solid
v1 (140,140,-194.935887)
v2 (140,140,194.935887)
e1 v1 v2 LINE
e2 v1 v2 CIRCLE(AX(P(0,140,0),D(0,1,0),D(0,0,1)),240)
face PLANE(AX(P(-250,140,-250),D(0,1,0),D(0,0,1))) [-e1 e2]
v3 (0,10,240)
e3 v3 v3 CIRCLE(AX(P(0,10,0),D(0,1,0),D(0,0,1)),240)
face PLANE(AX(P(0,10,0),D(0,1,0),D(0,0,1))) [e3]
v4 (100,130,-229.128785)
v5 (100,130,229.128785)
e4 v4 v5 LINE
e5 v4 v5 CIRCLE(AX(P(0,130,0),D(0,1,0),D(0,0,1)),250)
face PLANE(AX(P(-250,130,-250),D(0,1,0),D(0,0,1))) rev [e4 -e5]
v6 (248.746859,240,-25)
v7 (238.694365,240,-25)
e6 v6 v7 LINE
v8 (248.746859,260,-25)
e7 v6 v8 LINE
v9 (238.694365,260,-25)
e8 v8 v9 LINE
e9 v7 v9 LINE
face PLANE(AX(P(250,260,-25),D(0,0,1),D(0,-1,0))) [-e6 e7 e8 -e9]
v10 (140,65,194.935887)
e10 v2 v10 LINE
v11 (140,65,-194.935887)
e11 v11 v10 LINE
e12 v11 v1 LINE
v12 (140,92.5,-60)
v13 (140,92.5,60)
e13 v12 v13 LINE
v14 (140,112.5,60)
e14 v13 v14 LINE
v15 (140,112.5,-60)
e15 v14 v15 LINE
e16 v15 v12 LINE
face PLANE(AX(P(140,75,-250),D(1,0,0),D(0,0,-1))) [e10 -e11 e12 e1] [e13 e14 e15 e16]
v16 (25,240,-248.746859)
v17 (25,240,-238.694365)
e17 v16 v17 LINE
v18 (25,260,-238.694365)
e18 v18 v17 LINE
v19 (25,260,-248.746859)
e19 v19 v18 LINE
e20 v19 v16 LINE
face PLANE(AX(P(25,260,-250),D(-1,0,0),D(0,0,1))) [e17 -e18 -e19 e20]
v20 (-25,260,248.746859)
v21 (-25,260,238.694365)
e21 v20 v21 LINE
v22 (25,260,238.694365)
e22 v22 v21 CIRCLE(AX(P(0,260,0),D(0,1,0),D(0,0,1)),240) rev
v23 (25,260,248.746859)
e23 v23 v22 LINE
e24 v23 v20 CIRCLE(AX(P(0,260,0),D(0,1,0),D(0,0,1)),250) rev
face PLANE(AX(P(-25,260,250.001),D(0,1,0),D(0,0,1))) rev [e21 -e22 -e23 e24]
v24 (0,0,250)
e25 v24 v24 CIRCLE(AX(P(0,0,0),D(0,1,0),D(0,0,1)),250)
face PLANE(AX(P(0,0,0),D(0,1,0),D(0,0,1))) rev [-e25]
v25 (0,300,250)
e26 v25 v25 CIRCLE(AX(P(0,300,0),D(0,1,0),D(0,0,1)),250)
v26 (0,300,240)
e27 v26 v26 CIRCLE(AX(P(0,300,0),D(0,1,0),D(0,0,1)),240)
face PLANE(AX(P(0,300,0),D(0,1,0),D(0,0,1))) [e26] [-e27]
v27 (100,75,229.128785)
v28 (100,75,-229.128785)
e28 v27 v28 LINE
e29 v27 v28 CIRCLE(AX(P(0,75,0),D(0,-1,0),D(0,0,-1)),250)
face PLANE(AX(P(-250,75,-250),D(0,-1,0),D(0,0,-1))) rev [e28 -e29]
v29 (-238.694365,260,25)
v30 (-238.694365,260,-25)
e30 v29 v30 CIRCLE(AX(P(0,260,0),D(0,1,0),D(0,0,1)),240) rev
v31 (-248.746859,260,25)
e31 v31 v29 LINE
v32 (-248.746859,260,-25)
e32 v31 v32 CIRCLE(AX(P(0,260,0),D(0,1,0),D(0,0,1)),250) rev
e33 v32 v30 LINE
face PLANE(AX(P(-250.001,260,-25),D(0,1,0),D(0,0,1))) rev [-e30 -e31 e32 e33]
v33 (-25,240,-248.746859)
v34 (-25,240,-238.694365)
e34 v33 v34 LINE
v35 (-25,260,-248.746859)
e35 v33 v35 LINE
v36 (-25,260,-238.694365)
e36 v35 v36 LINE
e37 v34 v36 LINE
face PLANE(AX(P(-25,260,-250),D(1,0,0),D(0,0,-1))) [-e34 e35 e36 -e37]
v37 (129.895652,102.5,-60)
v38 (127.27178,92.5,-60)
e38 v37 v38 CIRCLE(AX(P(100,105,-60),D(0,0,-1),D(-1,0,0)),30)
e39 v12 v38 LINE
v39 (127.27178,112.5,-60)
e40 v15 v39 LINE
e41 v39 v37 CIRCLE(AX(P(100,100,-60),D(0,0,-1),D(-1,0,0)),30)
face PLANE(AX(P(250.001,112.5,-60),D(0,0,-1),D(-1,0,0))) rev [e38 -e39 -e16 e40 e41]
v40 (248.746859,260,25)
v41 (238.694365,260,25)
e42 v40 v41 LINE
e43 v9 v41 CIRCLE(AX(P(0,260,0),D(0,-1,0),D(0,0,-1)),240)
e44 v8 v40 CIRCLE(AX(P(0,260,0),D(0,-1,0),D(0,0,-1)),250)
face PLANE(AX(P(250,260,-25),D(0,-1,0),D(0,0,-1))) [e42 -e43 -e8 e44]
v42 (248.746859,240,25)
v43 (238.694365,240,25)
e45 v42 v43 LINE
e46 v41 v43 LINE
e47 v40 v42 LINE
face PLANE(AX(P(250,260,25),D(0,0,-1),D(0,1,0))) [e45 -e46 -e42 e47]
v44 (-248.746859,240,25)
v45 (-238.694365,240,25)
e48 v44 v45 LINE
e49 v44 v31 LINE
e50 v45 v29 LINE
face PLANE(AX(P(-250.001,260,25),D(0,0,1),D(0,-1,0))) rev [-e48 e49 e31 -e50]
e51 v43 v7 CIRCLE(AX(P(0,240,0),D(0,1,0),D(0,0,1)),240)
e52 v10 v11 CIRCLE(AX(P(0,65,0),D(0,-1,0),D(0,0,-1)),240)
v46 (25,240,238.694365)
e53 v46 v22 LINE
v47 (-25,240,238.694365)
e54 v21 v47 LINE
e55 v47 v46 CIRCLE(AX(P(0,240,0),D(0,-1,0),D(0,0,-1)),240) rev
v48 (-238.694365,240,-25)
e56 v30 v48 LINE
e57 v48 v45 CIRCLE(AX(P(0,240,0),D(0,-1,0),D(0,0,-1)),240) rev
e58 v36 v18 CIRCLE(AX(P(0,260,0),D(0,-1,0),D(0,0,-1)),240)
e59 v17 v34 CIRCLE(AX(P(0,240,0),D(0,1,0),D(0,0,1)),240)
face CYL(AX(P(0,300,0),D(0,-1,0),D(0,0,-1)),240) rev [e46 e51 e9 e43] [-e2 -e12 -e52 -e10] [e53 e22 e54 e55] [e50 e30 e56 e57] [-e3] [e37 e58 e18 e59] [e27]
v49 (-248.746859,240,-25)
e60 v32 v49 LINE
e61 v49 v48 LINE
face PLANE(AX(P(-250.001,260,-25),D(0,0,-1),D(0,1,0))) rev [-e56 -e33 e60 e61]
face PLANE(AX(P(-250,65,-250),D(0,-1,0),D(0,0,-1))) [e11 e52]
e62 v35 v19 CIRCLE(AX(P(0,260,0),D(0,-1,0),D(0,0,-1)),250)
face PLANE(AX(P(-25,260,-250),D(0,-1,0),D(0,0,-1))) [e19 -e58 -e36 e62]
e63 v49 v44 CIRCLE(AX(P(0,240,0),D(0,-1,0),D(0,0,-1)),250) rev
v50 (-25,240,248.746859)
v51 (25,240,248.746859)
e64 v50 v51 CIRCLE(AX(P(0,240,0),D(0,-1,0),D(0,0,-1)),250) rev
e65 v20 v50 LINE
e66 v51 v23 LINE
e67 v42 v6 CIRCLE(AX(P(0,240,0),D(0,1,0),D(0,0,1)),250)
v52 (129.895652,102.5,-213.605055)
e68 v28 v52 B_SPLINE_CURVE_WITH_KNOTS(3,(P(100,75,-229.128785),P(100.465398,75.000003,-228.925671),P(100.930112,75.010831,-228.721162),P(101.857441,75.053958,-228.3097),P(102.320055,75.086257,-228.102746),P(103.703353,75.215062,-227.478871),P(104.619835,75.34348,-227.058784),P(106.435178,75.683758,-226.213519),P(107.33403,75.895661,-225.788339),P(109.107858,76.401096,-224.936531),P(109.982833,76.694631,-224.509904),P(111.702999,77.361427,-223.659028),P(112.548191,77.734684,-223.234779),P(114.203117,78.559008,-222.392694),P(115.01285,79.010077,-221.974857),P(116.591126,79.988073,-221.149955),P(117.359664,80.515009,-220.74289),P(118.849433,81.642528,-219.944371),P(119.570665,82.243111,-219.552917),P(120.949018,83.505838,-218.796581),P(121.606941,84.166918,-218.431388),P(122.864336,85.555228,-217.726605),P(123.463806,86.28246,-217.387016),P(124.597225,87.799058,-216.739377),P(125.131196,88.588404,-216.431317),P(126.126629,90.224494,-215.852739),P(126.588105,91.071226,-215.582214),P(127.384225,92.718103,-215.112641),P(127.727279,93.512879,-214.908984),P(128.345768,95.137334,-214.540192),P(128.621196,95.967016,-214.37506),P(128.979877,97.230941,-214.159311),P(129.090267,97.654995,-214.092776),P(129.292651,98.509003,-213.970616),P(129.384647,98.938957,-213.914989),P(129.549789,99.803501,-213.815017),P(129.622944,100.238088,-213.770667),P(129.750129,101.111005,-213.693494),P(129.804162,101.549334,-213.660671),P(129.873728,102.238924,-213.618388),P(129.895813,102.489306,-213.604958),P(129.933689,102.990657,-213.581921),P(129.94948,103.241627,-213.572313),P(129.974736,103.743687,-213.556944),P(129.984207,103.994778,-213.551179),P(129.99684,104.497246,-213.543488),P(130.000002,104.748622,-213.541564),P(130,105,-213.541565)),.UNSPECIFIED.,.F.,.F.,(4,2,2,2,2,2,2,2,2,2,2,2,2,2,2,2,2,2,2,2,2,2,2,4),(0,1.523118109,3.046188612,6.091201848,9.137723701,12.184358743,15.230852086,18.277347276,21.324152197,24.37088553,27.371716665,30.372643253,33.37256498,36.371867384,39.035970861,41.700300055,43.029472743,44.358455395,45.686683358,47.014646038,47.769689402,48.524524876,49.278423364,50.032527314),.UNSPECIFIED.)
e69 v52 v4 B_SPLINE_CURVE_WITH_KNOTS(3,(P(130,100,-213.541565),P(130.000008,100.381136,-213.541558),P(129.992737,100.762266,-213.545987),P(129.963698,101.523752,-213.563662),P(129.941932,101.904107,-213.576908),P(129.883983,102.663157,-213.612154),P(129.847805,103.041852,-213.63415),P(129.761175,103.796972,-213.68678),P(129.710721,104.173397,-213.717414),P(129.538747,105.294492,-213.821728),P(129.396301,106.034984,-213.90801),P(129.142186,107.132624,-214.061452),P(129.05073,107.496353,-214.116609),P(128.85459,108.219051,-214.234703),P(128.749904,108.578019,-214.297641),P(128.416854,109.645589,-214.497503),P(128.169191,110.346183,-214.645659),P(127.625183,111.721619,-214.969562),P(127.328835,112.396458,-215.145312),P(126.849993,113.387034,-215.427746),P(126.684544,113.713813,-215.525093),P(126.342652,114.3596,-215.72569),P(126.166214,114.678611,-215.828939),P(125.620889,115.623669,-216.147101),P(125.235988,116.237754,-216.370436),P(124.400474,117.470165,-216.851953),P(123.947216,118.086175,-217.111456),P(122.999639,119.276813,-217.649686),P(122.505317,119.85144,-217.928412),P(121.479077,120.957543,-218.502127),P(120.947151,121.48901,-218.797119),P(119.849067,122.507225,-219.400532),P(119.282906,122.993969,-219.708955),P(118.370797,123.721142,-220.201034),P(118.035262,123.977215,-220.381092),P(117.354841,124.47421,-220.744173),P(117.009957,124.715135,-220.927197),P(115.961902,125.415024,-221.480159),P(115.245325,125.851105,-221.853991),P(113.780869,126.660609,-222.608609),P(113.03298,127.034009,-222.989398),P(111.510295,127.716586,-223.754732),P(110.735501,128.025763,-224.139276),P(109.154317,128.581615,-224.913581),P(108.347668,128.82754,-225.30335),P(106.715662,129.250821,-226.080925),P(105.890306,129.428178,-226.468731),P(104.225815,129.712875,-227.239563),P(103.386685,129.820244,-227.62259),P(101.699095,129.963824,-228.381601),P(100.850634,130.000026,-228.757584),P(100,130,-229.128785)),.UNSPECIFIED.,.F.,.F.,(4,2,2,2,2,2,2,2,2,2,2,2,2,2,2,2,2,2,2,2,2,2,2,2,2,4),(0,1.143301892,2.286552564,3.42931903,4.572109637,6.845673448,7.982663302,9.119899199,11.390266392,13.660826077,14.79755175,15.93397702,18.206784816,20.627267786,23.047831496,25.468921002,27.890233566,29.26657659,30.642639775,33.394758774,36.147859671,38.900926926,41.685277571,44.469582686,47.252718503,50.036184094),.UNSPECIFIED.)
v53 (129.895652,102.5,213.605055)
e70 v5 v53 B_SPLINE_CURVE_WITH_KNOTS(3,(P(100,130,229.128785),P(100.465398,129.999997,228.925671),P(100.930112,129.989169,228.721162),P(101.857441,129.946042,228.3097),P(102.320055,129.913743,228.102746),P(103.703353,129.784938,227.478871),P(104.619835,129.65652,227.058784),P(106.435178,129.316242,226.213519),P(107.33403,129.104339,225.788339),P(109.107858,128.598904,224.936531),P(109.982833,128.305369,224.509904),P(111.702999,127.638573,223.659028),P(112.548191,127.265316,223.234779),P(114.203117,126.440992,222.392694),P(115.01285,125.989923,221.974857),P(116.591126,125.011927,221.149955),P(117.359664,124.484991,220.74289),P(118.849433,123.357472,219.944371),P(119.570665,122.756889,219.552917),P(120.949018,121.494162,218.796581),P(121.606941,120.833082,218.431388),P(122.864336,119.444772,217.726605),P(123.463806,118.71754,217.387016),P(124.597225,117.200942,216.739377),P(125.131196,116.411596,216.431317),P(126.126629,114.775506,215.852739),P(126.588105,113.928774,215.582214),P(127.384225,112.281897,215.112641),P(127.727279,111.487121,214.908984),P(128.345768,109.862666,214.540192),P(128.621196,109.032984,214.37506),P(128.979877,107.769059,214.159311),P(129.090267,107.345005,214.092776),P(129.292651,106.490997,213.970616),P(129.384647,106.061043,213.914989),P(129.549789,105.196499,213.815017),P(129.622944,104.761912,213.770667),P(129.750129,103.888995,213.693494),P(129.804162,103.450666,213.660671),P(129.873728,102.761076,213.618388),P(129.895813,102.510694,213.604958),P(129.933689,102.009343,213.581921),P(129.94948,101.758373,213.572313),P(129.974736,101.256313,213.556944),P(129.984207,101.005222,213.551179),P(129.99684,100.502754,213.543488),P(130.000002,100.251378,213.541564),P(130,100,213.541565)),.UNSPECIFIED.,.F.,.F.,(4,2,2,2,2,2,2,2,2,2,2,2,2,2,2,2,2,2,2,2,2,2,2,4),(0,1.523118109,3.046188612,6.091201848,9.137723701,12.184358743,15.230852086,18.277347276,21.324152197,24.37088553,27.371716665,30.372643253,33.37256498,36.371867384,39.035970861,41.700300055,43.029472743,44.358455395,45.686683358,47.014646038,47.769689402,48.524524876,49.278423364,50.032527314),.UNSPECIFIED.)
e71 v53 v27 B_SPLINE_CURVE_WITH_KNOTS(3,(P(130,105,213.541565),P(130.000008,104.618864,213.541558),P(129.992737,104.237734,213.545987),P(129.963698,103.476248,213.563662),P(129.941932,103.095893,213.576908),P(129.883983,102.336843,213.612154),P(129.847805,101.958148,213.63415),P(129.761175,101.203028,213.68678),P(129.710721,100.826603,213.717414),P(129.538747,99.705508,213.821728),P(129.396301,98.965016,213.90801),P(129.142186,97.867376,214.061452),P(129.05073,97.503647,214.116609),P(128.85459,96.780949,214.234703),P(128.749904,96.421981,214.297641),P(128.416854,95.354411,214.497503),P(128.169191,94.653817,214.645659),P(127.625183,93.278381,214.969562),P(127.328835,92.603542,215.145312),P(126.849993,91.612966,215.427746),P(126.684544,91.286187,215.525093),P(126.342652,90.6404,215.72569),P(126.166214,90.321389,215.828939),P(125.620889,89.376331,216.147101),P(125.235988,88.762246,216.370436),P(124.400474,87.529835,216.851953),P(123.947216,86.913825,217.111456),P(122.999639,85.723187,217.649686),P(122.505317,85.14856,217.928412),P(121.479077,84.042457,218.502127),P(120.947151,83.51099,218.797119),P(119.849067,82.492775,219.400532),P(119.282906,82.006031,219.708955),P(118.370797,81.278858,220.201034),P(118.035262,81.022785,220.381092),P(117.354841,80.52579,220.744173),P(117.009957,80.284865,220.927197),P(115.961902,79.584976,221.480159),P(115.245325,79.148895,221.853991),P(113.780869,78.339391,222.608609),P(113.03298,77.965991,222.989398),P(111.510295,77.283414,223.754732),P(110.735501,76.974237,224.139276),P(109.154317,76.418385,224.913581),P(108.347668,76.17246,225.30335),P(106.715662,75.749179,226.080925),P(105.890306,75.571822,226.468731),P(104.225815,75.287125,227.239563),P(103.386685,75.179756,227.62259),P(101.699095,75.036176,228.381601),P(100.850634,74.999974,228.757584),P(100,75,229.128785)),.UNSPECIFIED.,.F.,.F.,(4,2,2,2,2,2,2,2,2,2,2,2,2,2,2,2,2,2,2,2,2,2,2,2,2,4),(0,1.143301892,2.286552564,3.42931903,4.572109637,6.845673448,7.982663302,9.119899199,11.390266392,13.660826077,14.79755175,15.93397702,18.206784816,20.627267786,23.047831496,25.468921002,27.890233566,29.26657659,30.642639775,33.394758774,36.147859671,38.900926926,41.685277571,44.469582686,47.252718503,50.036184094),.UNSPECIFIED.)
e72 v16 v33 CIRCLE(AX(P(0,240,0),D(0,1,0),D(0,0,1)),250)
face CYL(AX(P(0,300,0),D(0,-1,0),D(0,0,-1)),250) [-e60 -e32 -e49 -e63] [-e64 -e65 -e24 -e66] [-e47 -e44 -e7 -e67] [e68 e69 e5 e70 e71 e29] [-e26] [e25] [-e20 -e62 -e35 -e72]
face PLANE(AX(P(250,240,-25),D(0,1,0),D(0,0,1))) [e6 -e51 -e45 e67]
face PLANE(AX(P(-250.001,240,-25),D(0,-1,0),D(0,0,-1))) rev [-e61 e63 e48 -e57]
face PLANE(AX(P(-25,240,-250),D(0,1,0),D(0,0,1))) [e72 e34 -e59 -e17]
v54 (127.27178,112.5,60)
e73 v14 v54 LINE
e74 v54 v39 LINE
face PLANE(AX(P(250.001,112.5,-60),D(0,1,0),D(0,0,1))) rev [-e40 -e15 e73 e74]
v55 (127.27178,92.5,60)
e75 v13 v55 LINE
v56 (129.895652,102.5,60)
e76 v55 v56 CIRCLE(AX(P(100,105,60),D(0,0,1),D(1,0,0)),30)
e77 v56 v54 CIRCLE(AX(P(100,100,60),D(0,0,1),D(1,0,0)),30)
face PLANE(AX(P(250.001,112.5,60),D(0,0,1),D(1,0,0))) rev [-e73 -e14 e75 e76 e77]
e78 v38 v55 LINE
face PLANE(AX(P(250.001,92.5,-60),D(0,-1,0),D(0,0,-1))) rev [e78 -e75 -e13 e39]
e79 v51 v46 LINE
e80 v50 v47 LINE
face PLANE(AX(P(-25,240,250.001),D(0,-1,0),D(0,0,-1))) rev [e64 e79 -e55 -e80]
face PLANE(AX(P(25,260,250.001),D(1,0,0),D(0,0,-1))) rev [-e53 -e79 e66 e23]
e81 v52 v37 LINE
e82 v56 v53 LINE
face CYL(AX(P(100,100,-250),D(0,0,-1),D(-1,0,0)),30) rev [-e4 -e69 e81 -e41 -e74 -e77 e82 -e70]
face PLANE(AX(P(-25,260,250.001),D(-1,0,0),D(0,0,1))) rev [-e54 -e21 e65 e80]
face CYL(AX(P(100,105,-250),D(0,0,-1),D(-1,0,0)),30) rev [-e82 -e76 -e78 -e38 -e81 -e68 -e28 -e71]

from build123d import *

# Parameters (mm, degrees)
SKETCH2_R                      = 250
BOSS_EXTRUDE1_DEPTH            = 300
CUT_EXTRUDE1_DEPTH             = 464.680924775
CUT_EXTRUDE1_DEPTH_BACK        = 464.680924775
SKETCH3_W                      = 380
SKETCH3_H                      = 55
SHELL1_START                   = 140
SHELL1_OUTLINE_R               = 240
SHELL1_DEPTH                   = 150
SHELL1_START_2                 = 10
SHELL1_2_OUTLINE_R             = 240
SHELL1_2_DEPTH                 = 55
SHELL1_START_3                 = 65
SHELL1_3_DEPTH                 = 75
CUT_EXTRUDE2_REACH             = 546.885
SKETCH4_W                      = 120
SKETCH4_H                      = 20
CUT_EXTRUDE5_START             = -20
SKETCH6_R                      = 240
CUT_EXTRUDE5_DEPTH             = 20
CUT_EXTRUDE6_REACH             = 465.681
SKETCH8_3_W                    = 50
SKETCH8_3_H                    = 20
CUT_EXTRUDE6_DIRECTION_2_DEPTH = 464.680924775
CIRPATTERN1_COUNT              = 2
CIRPATTERN1_ANGLE              = 90
FILLET2_R                      = 30


# Read off the part's stored shape, not the designer's step: Shell1
with BuildPart() as part:
    # Sketch2 → Boss-Extrude1 (new body)
    with BuildSketch(Plane(origin=(0, 0, 0), x_dir=(1, 0, 0), z_dir=(0, 1, 0))):
        with Locations(Location((0, 0, 0), (0, 0, 270))):
            Circle(SKETCH2_R)
    extrude(amount=BOSS_EXTRUDE1_DEPTH)

    # Sketch3 → Cut-Extrude1 (cut, two sides: drawn at the far end of the back side and taken through both)
    with BuildSketch(Plane.XY.offset(-CUT_EXTRUDE1_DEPTH_BACK)):
        with Locations((-60, 102.5)):
            Rectangle(SKETCH3_W, SKETCH3_H)
    extrude(amount=CUT_EXTRUDE1_DEPTH + CUT_EXTRUDE1_DEPTH_BACK, mode=Mode.SUBTRACT)

    # Shell1 outline → Shell1 (cut)
    with BuildSketch(Plane(origin=(0, 0, 0), x_dir=(1, 0, 0), z_dir=(0, 1, 0)).offset(SHELL1_START)):
        Circle(SHELL1_OUTLINE_R)
    extrude(amount=SHELL1_DEPTH, mode=Mode.SUBTRACT)

    # Shell1 2 outline → Shell1 2 (cut)
    with BuildSketch(Plane(origin=(0, 0, 0), x_dir=(1, 0, 0), z_dir=(0, 1, 0)).offset(SHELL1_START_2)):
        Circle(SHELL1_2_OUTLINE_R)
    extrude(amount=SHELL1_2_DEPTH, mode=Mode.SUBTRACT)

    # Shell1 3 outline → Shell1 3 (cut)
    with BuildSketch(Plane(origin=(0, 0, 0), x_dir=(1, 0, 0), z_dir=(0, 1, 0)).offset(SHELL1_START_3)):
        with BuildLine():
            ThreePointArc((140, -194.935886896), (240, 0), (140, 194.935886896))
            Line((140, 194.935886896), (140, -194.935886896))
        make_face()
    extrude(amount=SHELL1_3_DEPTH, mode=Mode.SUBTRACT)

    # Sketch4 → Cut-Extrude2 (cut, up to next)
    with BuildSketch(Plane.ZY.offset(-130), mode=Mode.PRIVATE) as cut_extrude2_sk1:
        with Locations((0, 102.5)):
            Rectangle(SKETCH4_W, SKETCH4_H)
    cut_extrude2_tool1 = extrude(cut_extrude2_sk1.sketch, amount=-CUT_EXTRUDE2_REACH, mode=Mode.PRIVATE) & part.part
    add(cut_extrude2_tool1.solids().sort_by_distance((130, 102.5, 0))[0], mode=Mode.SUBTRACT)

    # Sketch6 → Cut-Extrude5 (cut)
    with BuildSketch(Plane(origin=(0, 300, 0), x_dir=(1, 0, 0), z_dir=(0, 1, 0)).offset(CUT_EXTRUDE5_START)):
        with Locations(Location((0, 0, 0), (0, 0, 270))):
            Circle(SKETCH6_R)
    extrude(amount=CUT_EXTRUDE5_DEPTH, mode=Mode.SUBTRACT)

    # Sketch8<3> → Cut-Extrude6 (cut, up to next)
    with BuildSketch(Plane(origin=(0, 0, 0), x_dir=(0, 0, -1), z_dir=(1, 0, 0)), mode=Mode.PRIVATE) as cut_extrude6_sk1:
        with Locations((0, 250)):
            Rectangle(SKETCH8_3_W, SKETCH8_3_H)
    cut_extrude6_tool1 = extrude(cut_extrude6_sk1.sketch, amount=-CUT_EXTRUDE6_REACH, mode=Mode.PRIVATE) & part.part
    cut_extrude6 = cut_extrude6_tool1.solids().sort_by_distance((0, 250, 0))[0]
    add(cut_extrude6, mode=Mode.SUBTRACT)

    # Sketch8<3> → Cut-Extrude6 direction 2 (cut)
    with BuildSketch(Plane(origin=(0, 0, 0), x_dir=(0, 0, -1), z_dir=(1, 0, 0))):
        with Locations((0, 250)):
            Rectangle(SKETCH8_3_W, SKETCH8_3_H)
    cut_extrude6_direction_2 = extrude(amount=CUT_EXTRUDE6_DIRECTION_2_DEPTH, mode=Mode.SUBTRACT)

    # CirPattern1: Cut-Extrude6, Cut-Extrude6 direction 2 ×2 about axis
    cirpattern1_axis = Axis((0, 300, 0), (0, 1, 0))
    add([cut_extrude6.rotate(cirpattern1_axis, i * CIRPATTERN1_ANGLE / (CIRPATTERN1_COUNT - 1)) for i in range(1, CIRPATTERN1_COUNT)], mode=Mode.SUBTRACT)
    add([cut_extrude6_direction_2.rotate(cirpattern1_axis, i * CIRPATTERN1_ANGLE / (CIRPATTERN1_COUNT - 1)) for i in range(1, CIRPATTERN1_COUNT)], mode=Mode.SUBTRACT)

    # Fillet2
    # the kernel refuses this fillet: 30 mm, written as the material it adds along each edge
    with BuildSketch(Plane(origin=(130, 130, -288.541565041), x_dir=(0, -1, 0), z_dir=(0, 0, 1))) as fillet2_piece_1_section:
        with BuildLine():
            CenterArc((FILLET2_R, -FILLET2_R), FILLET2_R, 90, 90)
            Line((0, -FILLET2_R), (0, 0))
            Line((0, 0), (FILLET2_R, 0))
        make_face()
    fillet2_piece_1 = extrude(amount=577.083130081, mode=Mode.PRIVATE)
    fillet2_piece_1 = fillet2_piece_1 & Plane(origin=(0, 108.141191738, 0), x_dir=(0, 0, 1), z_dir=(0, -1, 0)) * Cylinder(250, 1275, mode=Mode.PRIVATE)
    fillet2_piece_1 = split(fillet2_piece_1, bisect_by=Plane(origin=(129.633192853, 108.141191738, -60), z_dir=(0, 0, -1)), keep=Keep.TOP, mode=Mode.PRIVATE)
    fillet2_piece_1 = split(fillet2_piece_1, bisect_by=Plane(origin=(129.633192853, 112.5, -136.881350588), z_dir=(0, -1, 0)), keep=Keep.TOP, mode=Mode.PRIVATE)
    add(fillet2_piece_1)
    with BuildSketch(Plane(origin=(130, 130, -288.541565041), x_dir=(0, -1, 0), z_dir=(0, 0, 1))) as fillet2_piece_2_section:
        with BuildLine():
            CenterArc((FILLET2_R, -FILLET2_R), FILLET2_R, 90, 90)
            Line((0, -FILLET2_R), (0, 0))
            Line((0, 0), (FILLET2_R, 0))
        make_face()
    fillet2_piece_2 = extrude(amount=577.083130081, mode=Mode.PRIVATE)
    fillet2_piece_2 = fillet2_piece_2 & Plane(origin=(0, 124.602125162, 0), x_dir=(0, 0, 1), z_dir=(0, -1, 0)) * Cylinder(250, 1275, mode=Mode.PRIVATE)
    fillet2_piece_2 = split(fillet2_piece_2, bisect_by=Plane(origin=(122.496617269, 124.602125162, -60), z_dir=(0, 0, -1)), keep=Keep.TOP, mode=Mode.PRIVATE)
    fillet2_piece_2 = split(fillet2_piece_2, bisect_by=Plane(origin=(122.496617269, 112.5, -138.903095836), z_dir=(0, 1, 0)), keep=Keep.TOP, mode=Mode.PRIVATE)
    add(fillet2_piece_2)
    with BuildSketch(Plane(origin=(130, 130, -288.541565041), x_dir=(0, -1, 0), z_dir=(0, 0, 1))) as fillet2_piece_3_section:
        with BuildLine():
            CenterArc((FILLET2_R, -FILLET2_R), FILLET2_R, 90, 90)
            Line((0, -FILLET2_R), (0, 0))
            Line((0, 0), (FILLET2_R, 0))
        make_face()
    fillet2_piece_3 = extrude(amount=577.083130081, mode=Mode.PRIVATE)
    fillet2_piece_3 = split(fillet2_piece_3, bisect_by=Plane(origin=(122.639576661, 124.541490092, -60), z_dir=(0, 0, 1)), keep=Keep.TOP, mode=Mode.PRIVATE)
    fillet2_piece_3 = split(fillet2_piece_3, bisect_by=Plane(origin=(122.639576661, 124.541490092, 60), z_dir=(0, 0, -1)), keep=Keep.TOP, mode=Mode.PRIVATE)
    fillet2_piece_3 = split(fillet2_piece_3, bisect_by=Plane(origin=(122.639576661, 112.5, 0), z_dir=(0, 1, 0)), keep=Keep.TOP, mode=Mode.PRIVATE)
    add(fillet2_piece_3)
    with BuildSketch(Plane(origin=(130, 130, -288.541565041), x_dir=(0, -1, 0), z_dir=(0, 0, 1))) as fillet2_piece_4_section:
        with BuildLine():
            CenterArc((FILLET2_R, -FILLET2_R), FILLET2_R, 90, 90)
            Line((0, -FILLET2_R), (0, 0))
            Line((0, 0), (FILLET2_R, 0))
        make_face()
    fillet2_piece_4 = extrude(amount=577.083130081, mode=Mode.PRIVATE)
    fillet2_piece_4 = fillet2_piece_4 & Plane(origin=(0, 108.141191737, 0), x_dir=(0, 0, 1), z_dir=(0, -1, 0)) * Cylinder(250, 1275, mode=Mode.PRIVATE)
    fillet2_piece_4 = split(fillet2_piece_4, bisect_by=Plane(origin=(129.633192853, 108.141191737, 60), z_dir=(0, 0, 1)), keep=Keep.TOP, mode=Mode.PRIVATE)
    fillet2_piece_4 = split(fillet2_piece_4, bisect_by=Plane(origin=(129.633192853, 112.5, 136.881350585), z_dir=(0, -1, 0)), keep=Keep.TOP, mode=Mode.PRIVATE)
    add(fillet2_piece_4)
    with BuildSketch(Plane(origin=(130, 130, -288.541565041), x_dir=(0, -1, 0), z_dir=(0, 0, 1))) as fillet2_piece_5_section:
        with BuildLine():
            CenterArc((FILLET2_R, -FILLET2_R), FILLET2_R, 90, 90)
            Line((0, -FILLET2_R), (0, 0))
            Line((0, 0), (FILLET2_R, 0))
        make_face()
    fillet2_piece_5 = extrude(amount=577.083130081, mode=Mode.PRIVATE)
    fillet2_piece_5 = fillet2_piece_5 & Plane(origin=(0, 124.602106632, 0), x_dir=(0, 0, 1), z_dir=(0, -1, 0)) * Cylinder(250, 1275, mode=Mode.PRIVATE)
    fillet2_piece_5 = split(fillet2_piece_5, bisect_by=Plane(origin=(122.496572682, 124.602106632, 60), z_dir=(0, 0, 1)), keep=Keep.TOP, mode=Mode.PRIVATE)
    fillet2_piece_5 = split(fillet2_piece_5, bisect_by=Plane(origin=(122.496572682, 112.5, 138.903516263), z_dir=(0, 1, 0)), keep=Keep.TOP, mode=Mode.PRIVATE)
    add(fillet2_piece_5)
    with BuildSketch(Plane(origin=(130, 75, -288.541565041), x_dir=(-1, 0, 0), z_dir=(0, 0, 1))) as fillet2_piece_6_section:
        with BuildLine():
            CenterArc((FILLET2_R, -FILLET2_R), FILLET2_R, 90, 90)
            Line((0, -FILLET2_R), (0, 0))
            Line((0, 0), (FILLET2_R, 0))
        make_face()
    fillet2_piece_6 = extrude(amount=577.083130081, mode=Mode.PRIVATE)
    fillet2_piece_6 = fillet2_piece_6 & Plane(origin=(0, 80.397884307, 0), x_dir=(0, 0, 1), z_dir=(0, -1, 0)) * Cylinder(250, 1275, mode=Mode.PRIVATE)
    fillet2_piece_6 = split(fillet2_piece_6, bisect_by=Plane(origin=(122.496621968, 80.397884307, -60), z_dir=(0, 0, -1)), keep=Keep.TOP, mode=Mode.PRIVATE)
    fillet2_piece_6 = split(fillet2_piece_6, bisect_by=Plane(origin=(122.496621968, 92.5, -138.903256412), z_dir=(0, -1, 0)), keep=Keep.TOP, mode=Mode.PRIVATE)
    add(fillet2_piece_6)
    with BuildSketch(Plane(origin=(130, 75, -288.541565041), x_dir=(-1, 0, 0), z_dir=(0, 0, 1))) as fillet2_piece_7_section:
        with BuildLine():
            CenterArc((FILLET2_R, -FILLET2_R), FILLET2_R, 90, 90)
            Line((0, -FILLET2_R), (0, 0))
            Line((0, 0), (FILLET2_R, 0))
        make_face()
    fillet2_piece_7 = extrude(amount=577.083130081, mode=Mode.PRIVATE)
    fillet2_piece_7 = fillet2_piece_7 & Plane(origin=(0, 96.858808254, 0), x_dir=(0, 0, 1), z_dir=(0, -1, 0)) * Cylinder(250, 1275, mode=Mode.PRIVATE)
    fillet2_piece_7 = split(fillet2_piece_7, bisect_by=Plane(origin=(129.633192853, 96.858808254, -60), z_dir=(0, 0, -1)), keep=Keep.TOP, mode=Mode.PRIVATE)
    fillet2_piece_7 = split(fillet2_piece_7, bisect_by=Plane(origin=(129.633192853, 92.5, -136.881350463), z_dir=(0, 1, 0)), keep=Keep.TOP, mode=Mode.PRIVATE)
    add(fillet2_piece_7)
    with BuildSketch(Plane(origin=(130, 75, -288.541565041), x_dir=(-1, 0, 0), z_dir=(0, 0, 1))) as fillet2_piece_8_section:
        with BuildLine():
            CenterArc((FILLET2_R, -FILLET2_R), FILLET2_R, 90, 90)
            Line((0, -FILLET2_R), (0, 0))
            Line((0, 0), (FILLET2_R, 0))
        make_face()
    fillet2_piece_8 = extrude(amount=577.083130081, mode=Mode.PRIVATE)
    fillet2_piece_8 = split(fillet2_piece_8, bisect_by=Plane(origin=(122.639576661, 80.458509908, -60), z_dir=(0, 0, 1)), keep=Keep.TOP, mode=Mode.PRIVATE)
    fillet2_piece_8 = split(fillet2_piece_8, bisect_by=Plane(origin=(122.639576661, 92.5, 0), z_dir=(0, -1, 0)), keep=Keep.TOP, mode=Mode.PRIVATE)
    fillet2_piece_8 = split(fillet2_piece_8, bisect_by=Plane(origin=(122.639576661, 80.458509908, 60), z_dir=(0, 0, -1)), keep=Keep.TOP, mode=Mode.PRIVATE)
    add(fillet2_piece_8)
    with BuildSketch(Plane(origin=(130, 75, -288.541565041), x_dir=(-1, 0, 0), z_dir=(0, 0, 1))) as fillet2_piece_9_section:
        with BuildLine():
            CenterArc((FILLET2_R, -FILLET2_R), FILLET2_R, 90, 90)
            Line((0, -FILLET2_R), (0, 0))
            Line((0, 0), (FILLET2_R, 0))
        make_face()
    fillet2_piece_9 = extrude(amount=577.083130081, mode=Mode.PRIVATE)
    fillet2_piece_9 = fillet2_piece_9 & Plane(origin=(0, 80.397869734, 0), x_dir=(0, 0, 1), z_dir=(0, -1, 0)) * Cylinder(250, 1275, mode=Mode.PRIVATE)
    fillet2_piece_9 = split(fillet2_piece_9, bisect_by=Plane(origin=(122.496641232, 92.5, 138.903074765), z_dir=(0, -1, 0)), keep=Keep.TOP, mode=Mode.PRIVATE)
    fillet2_piece_9 = split(fillet2_piece_9, bisect_by=Plane(origin=(122.496641232, 80.397869734, 60), z_dir=(0, 0, 1)), keep=Keep.TOP, mode=Mode.PRIVATE)
    add(fillet2_piece_9)
    with BuildSketch(Plane(origin=(130, 75, -288.541565041), x_dir=(-1, 0, 0), z_dir=(0, 0, 1))) as fillet2_piece_10_section:
        with BuildLine():
            CenterArc((FILLET2_R, -FILLET2_R), FILLET2_R, 90, 90)
            Line((0, -FILLET2_R), (0, 0))
            Line((0, 0), (FILLET2_R, 0))
        make_face()
    fillet2_piece_10 = extrude(amount=577.083130081, mode=Mode.PRIVATE)
    fillet2_piece_10 = fillet2_piece_10 & Plane(origin=(0, 96.858808255, 0), x_dir=(0, 0, 1), z_dir=(0, -1, 0)) * Cylinder(250, 1275, mode=Mode.PRIVATE)
    fillet2_piece_10 = split(fillet2_piece_10, bisect_by=Plane(origin=(129.633192854, 92.5, 136.881350462), z_dir=(0, 1, 0)), keep=Keep.TOP, mode=Mode.PRIVATE)
    fillet2_piece_10 = split(fillet2_piece_10, bisect_by=Plane(origin=(129.633192854, 96.858808255, 60), z_dir=(0, 0, 1)), keep=Keep.TOP, mode=Mode.PRIVATE)
    add(fillet2_piece_10)


solid = part.part
